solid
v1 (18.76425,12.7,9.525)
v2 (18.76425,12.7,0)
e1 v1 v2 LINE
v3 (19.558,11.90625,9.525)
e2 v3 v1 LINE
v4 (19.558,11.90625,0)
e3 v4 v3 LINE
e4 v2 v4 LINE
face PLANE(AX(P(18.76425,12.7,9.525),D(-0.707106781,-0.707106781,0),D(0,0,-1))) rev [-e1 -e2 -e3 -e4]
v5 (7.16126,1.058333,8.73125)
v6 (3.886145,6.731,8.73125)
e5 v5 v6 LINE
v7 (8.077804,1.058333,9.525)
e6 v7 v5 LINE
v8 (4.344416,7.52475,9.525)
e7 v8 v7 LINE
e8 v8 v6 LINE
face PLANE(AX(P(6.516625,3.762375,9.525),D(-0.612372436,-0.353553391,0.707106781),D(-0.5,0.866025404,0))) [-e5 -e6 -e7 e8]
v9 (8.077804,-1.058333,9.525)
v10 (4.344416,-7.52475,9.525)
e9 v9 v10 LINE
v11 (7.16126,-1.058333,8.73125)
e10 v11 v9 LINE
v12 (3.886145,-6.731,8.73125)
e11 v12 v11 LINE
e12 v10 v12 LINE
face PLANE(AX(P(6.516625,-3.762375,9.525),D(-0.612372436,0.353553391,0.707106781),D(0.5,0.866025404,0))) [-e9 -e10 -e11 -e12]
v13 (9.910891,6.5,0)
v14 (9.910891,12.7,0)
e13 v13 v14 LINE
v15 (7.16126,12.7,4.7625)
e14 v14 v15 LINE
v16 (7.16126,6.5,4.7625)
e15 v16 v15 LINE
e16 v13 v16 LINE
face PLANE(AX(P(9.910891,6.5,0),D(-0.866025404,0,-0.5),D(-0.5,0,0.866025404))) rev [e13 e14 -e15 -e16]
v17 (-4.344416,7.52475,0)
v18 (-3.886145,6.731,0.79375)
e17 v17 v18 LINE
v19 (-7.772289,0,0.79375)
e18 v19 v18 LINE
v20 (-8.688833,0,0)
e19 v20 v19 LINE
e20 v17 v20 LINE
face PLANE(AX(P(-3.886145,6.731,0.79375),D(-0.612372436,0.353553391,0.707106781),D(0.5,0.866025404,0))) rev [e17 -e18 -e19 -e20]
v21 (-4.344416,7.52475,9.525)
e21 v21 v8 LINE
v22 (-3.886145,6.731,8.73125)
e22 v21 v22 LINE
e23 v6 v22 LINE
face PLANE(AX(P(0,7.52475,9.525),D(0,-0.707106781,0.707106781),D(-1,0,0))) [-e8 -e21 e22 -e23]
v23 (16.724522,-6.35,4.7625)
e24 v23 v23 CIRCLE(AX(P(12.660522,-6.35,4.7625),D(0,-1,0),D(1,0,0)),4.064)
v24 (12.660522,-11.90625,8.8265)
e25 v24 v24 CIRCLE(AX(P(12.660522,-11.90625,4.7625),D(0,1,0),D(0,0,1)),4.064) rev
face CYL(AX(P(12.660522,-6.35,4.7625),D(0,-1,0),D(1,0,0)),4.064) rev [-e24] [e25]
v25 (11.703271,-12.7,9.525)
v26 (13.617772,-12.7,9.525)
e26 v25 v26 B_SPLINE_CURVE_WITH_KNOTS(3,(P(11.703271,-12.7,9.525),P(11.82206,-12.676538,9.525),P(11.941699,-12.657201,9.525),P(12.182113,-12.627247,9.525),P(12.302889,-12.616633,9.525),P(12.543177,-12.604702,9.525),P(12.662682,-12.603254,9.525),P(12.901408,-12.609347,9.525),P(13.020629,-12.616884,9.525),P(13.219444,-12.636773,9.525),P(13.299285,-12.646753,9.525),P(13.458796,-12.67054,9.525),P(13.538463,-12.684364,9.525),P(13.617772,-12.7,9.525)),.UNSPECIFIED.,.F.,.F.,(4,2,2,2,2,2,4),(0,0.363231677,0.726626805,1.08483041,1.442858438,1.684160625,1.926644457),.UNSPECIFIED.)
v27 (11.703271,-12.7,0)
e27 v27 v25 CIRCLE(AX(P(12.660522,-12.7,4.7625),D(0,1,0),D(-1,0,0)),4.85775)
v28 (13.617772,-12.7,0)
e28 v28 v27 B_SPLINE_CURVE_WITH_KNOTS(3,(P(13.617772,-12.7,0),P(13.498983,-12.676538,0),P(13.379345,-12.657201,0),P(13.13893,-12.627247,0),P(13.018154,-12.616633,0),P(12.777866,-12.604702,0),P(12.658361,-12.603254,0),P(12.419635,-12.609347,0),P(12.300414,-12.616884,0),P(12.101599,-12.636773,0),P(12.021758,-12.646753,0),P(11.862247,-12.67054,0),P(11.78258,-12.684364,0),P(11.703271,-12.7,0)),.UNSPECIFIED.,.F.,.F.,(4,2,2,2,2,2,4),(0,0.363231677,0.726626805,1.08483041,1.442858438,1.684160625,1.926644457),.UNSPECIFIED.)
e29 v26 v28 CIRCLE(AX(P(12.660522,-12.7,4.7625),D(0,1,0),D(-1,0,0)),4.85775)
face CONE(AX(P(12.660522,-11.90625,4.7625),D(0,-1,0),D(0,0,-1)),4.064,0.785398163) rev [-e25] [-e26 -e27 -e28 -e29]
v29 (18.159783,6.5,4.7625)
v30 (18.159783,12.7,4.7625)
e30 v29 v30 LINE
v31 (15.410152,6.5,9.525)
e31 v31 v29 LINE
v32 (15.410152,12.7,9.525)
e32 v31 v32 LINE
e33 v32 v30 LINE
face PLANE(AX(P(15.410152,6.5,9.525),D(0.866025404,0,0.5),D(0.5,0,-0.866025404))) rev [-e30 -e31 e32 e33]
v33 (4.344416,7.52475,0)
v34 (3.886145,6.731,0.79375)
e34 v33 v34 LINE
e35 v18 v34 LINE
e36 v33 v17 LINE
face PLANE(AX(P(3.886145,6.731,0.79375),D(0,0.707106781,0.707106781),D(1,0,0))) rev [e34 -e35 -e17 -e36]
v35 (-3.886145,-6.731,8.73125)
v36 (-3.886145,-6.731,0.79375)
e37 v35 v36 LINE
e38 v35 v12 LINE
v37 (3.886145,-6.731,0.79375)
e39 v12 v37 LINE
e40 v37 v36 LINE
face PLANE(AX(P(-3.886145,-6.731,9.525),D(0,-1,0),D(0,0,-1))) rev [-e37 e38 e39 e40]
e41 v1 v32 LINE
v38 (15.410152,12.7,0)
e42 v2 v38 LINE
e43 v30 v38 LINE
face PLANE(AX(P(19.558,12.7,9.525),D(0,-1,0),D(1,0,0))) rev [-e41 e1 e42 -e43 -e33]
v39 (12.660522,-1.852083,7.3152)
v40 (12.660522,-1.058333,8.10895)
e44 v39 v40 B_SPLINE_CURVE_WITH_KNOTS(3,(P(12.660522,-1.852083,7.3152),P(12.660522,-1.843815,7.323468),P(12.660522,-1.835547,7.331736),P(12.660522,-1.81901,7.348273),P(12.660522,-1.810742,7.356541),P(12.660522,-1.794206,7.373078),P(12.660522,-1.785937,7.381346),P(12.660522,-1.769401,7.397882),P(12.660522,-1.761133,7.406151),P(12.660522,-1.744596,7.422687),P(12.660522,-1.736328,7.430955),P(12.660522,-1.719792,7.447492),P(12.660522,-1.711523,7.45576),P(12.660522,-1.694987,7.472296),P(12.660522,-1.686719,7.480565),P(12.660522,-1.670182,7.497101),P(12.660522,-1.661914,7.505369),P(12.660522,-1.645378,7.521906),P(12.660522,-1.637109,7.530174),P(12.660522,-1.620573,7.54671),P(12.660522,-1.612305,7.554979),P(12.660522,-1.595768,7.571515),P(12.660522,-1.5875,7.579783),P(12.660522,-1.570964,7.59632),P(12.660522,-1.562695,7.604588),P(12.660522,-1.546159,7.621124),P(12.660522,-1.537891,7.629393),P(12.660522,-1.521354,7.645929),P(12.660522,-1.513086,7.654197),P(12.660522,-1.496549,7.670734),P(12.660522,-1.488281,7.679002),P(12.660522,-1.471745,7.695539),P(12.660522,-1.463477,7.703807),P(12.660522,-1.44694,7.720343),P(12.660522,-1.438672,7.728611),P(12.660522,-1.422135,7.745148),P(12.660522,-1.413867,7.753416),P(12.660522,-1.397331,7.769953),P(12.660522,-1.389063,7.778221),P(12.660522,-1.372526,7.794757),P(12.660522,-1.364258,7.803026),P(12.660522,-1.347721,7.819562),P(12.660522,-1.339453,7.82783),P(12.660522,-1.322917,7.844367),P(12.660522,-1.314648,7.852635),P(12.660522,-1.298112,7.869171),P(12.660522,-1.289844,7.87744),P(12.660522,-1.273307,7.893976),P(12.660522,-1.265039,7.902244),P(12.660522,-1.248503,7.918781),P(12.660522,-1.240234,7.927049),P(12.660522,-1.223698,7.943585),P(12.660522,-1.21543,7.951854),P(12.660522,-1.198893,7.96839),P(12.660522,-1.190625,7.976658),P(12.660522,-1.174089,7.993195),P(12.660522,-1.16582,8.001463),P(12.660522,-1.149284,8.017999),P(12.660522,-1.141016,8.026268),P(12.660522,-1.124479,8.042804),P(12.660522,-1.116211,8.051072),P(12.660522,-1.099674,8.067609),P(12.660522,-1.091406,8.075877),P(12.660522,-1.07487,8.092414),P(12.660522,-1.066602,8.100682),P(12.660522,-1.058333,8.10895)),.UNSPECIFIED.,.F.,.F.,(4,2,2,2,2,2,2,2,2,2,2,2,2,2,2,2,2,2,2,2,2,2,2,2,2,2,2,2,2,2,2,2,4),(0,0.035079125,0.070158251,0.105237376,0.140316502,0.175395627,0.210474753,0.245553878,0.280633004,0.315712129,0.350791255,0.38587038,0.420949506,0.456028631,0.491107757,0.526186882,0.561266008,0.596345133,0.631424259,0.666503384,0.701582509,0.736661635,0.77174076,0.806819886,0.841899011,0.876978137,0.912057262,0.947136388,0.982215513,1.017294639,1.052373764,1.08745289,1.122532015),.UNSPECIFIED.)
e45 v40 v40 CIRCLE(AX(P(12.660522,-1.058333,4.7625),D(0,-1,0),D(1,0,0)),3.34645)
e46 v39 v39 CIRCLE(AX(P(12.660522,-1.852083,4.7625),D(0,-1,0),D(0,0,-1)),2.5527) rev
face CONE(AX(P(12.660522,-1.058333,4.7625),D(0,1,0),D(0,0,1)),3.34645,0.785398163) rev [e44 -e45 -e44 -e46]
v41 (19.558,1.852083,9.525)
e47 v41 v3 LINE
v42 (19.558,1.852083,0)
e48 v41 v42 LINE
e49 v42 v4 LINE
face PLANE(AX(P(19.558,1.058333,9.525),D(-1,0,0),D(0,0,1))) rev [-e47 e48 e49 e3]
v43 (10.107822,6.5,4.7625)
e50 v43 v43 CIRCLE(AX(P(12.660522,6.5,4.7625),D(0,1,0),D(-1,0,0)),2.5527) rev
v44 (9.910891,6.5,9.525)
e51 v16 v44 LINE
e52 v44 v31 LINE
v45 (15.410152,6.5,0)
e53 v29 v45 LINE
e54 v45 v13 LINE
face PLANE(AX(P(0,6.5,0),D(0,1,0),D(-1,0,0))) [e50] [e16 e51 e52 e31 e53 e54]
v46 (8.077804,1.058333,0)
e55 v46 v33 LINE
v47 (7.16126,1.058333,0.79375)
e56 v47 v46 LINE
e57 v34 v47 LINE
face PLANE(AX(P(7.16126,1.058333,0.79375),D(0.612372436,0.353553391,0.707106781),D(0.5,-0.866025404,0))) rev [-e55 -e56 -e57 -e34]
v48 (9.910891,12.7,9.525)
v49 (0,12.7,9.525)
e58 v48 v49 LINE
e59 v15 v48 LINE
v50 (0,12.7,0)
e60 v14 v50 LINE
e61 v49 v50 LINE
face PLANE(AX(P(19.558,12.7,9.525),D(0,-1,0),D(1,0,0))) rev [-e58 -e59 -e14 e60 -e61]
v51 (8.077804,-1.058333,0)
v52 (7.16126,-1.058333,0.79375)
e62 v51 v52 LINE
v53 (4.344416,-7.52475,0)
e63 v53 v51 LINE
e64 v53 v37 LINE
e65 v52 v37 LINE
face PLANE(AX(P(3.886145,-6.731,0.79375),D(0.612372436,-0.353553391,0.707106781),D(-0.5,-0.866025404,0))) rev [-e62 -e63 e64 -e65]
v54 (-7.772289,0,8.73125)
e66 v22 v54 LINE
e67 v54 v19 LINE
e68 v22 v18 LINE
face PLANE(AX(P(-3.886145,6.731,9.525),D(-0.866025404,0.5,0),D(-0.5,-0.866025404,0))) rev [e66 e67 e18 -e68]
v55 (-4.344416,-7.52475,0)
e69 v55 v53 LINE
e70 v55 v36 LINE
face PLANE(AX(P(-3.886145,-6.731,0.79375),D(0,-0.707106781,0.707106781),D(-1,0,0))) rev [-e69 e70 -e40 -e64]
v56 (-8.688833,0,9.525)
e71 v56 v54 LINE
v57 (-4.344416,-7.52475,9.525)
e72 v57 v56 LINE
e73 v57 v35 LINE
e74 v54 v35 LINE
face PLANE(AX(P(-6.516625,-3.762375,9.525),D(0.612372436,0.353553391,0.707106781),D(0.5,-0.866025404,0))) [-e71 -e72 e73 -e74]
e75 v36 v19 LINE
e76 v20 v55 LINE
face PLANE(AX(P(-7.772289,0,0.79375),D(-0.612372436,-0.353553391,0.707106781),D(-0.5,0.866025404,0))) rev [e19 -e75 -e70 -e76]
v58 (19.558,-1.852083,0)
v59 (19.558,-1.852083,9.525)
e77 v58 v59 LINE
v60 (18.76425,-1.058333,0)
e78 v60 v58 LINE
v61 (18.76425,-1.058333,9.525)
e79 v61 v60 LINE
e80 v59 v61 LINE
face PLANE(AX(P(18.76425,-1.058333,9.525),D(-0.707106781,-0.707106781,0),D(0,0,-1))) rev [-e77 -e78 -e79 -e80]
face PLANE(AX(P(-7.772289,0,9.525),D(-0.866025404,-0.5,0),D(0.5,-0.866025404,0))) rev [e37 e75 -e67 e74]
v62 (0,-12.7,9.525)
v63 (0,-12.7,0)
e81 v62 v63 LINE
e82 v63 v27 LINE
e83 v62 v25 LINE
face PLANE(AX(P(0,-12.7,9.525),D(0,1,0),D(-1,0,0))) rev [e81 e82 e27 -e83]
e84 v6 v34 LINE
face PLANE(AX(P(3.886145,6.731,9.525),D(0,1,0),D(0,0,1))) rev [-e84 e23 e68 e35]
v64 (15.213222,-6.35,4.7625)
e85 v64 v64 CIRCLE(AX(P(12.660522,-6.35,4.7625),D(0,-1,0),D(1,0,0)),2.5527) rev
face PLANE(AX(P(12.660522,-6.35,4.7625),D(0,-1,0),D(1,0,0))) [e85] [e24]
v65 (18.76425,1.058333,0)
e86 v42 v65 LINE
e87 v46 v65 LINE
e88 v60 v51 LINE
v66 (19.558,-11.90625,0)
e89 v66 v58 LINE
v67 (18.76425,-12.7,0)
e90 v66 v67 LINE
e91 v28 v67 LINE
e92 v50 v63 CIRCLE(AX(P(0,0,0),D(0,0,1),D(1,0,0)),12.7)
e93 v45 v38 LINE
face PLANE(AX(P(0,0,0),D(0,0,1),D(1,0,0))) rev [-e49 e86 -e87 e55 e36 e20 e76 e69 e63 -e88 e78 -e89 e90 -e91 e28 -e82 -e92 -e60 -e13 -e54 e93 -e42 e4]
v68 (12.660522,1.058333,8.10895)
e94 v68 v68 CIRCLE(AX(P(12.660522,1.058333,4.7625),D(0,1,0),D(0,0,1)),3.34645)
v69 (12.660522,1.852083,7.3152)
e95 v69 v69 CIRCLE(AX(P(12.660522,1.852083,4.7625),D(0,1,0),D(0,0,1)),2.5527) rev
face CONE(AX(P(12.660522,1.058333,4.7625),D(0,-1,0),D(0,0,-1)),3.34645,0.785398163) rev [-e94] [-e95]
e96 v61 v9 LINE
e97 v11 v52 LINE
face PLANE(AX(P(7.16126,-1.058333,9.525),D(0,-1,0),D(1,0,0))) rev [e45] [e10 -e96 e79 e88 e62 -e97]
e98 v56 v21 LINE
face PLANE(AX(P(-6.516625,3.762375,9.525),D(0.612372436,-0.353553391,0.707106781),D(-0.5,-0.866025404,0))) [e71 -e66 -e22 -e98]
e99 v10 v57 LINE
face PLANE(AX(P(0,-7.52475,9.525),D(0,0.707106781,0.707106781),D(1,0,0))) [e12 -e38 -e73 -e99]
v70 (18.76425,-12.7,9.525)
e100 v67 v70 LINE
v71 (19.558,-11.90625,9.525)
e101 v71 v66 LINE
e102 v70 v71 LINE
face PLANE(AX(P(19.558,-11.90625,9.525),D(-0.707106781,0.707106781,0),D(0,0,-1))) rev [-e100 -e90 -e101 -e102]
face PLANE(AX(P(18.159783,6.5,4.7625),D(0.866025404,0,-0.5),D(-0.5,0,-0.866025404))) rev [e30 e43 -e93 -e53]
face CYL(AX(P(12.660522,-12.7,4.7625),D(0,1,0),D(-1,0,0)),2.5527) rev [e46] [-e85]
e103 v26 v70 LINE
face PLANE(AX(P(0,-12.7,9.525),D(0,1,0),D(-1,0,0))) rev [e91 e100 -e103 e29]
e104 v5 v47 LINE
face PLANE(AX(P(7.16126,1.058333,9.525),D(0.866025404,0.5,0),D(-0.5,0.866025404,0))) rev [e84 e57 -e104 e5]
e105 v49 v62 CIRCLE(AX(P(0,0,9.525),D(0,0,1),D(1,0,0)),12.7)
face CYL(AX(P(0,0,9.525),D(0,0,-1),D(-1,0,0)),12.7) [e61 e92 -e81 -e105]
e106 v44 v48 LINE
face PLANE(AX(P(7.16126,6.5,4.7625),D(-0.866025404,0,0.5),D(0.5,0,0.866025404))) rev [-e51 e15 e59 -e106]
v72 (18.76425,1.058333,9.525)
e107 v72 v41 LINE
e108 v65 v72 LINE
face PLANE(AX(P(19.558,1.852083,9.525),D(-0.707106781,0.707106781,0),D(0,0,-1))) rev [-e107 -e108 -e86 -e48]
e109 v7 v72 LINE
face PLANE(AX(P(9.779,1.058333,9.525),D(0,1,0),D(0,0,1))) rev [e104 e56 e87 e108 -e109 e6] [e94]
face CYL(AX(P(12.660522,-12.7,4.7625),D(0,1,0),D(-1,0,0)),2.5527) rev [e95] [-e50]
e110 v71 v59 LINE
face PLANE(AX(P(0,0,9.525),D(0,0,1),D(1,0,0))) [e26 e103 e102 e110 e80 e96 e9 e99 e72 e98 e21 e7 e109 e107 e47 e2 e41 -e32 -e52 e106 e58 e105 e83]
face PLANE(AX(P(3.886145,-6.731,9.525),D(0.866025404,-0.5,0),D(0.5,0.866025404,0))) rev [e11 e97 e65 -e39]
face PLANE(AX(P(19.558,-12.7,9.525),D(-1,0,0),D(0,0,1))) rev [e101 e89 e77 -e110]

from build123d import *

# Parameters (mm, degrees)
BOSS_EXTRUDE1_DEPTH = 9.525
CHAMFER1_SIZE       = 0.79375
SKETCH3_R           = 2.5527
CUT_EXTRUDE1_DEPTH  = 34.442502732
CUT_EXTRUDE2_DEPTH  = 6.2
SKETCH5_R           = 4.064
CUT_EXTRUDE3_DEPTH  = 6.35
CHAFL_N1_SIZE       = 0.79375


with BuildPart() as part:
    # Sketch2 → Boss-Extrude1 (new body)
    with BuildSketch(Plane.XY):
        with BuildLine():
            Line((3.886144662, -6.731), (7.161260289, -1.058333333))
            Line((7.161260289, -1.058333333), (9.779, -1.058333333))
            Line((9.779, -1.058333333), (19.558, -1.058333333))
            Line((19.558, -1.058333333), (19.558, -12.7))
            Line((19.558, -12.7), (0, -12.7))
            ThreePointArc((0, -12.7), (-12.7, 0), (0, 12.7))
            Line((0, 12.7), (19.558, 12.7))
            Line((19.558, 12.7), (19.558, 1.058333333))
            Line((19.558, 1.058333333), (9.779, 1.058333333))
            Line((9.779, 1.058333333), (7.161260289, 1.058333333))
            Line((7.161260289, 1.058333333), (3.886144662, 6.731))
            Line((3.886144662, 6.731), (-3.886144662, 6.731))
            Line((-3.886144662, 6.731), (-7.772289324, 0))
            Line((-7.772289324, 0), (-3.886144662, -6.731))
            Line((-3.886144662, -6.731), (3.886144662, -6.731))
        make_face()
    extrude(amount=BOSS_EXTRUDE1_DEPTH)

    # Chamfer1
    chamfer1_edges = [part.edges().sort_by_distance(p)[0] for p in [
        (5.523702475, 3.894666667, 0),
        (0, 6.731, 0),
        (-5.829216993, 3.3655, 0),
        (-5.829216993, -3.3655, 0),
        (0, -6.731, 0),
        (5.523702475, -3.894666667, 0),
        (19.558, -1.058333333, 4.7625),
        (19.558, -12.7, 4.7625),
        (19.558, 12.7, 4.7625),
        (19.558, 1.058333333, 4.7625),
        (5.523702475, -3.894666667, 9.525),
        (0, -6.731, 9.525),
        (-5.829216993, -3.3655, 9.525),
        (-5.829216993, 3.3655, 9.525),
        (0, 6.731, 9.525),
        (5.523702475, 3.894666667, 9.525),
    ]]
    chamfer(chamfer1_edges, length=CHAMFER1_SIZE)

    # Sketch3 → Cut-Extrude1 (cut, through all)
    with BuildSketch(Plane(origin=(0, 12.7, 0), x_dir=(1, 0, 0), z_dir=(0, 1, 0))):
        with Locations(Location((12.660521603, -4.7625, 0), (0, 0, 180))):
            Circle(SKETCH3_R)
    extrude(amount=-CUT_EXTRUDE1_DEPTH, mode=Mode.SUBTRACT)

    # Sketch4 → Cut-Extrude2 (cut)
    with BuildSketch(Plane(origin=(0, 12.7, 0), x_dir=(1, 0, 0), z_dir=(0, 1, 0))):
        Polygon((9.910890946, -9.525), (15.41015226, -9.525), (18.159782917, -4.7625), (15.41015226, 0), (9.910890946, 0), (7.161260289, -4.7625), align=None)
    extrude(amount=-CUT_EXTRUDE2_DEPTH, mode=Mode.SUBTRACT)

    # Sketch5 → Cut-Extrude3 (cut)
    with BuildSketch(Plane.XZ.offset(12.7)):
        with Locations((12.660521603, 4.7625)):
            Circle(SKETCH5_R)
    extrude(amount=-CUT_EXTRUDE3_DEPTH, mode=Mode.SUBTRACT)

    # Chaflán1
    # the kernel refuses this chamfer: 0.79375 mm, written as the material it takes off along each edge
    with BuildSketch(Plane(origin=(12.660521603, -1.058333333, 4.7625), x_dir=(-1, 0, 0), z_dir=(0, 0, -1))) as chafl_n1_piece_1:
        Polygon((2.5527 + CHAFL_N1_SIZE, 0), (2.5527, -CHAFL_N1_SIZE), (2.5527, 0), align=None)
    revolve(axis=Axis((12.660521603, -1.058333333, 4.7625), (0, 1, 0)), mode=Mode.SUBTRACT)
    with BuildSketch(Plane(origin=(12.660521603, 1.058333333, 4.7625), x_dir=(-1, 0, 0), z_dir=(0, 0, -1))) as chafl_n1_piece_2:
        Polygon((2.5527 + CHAFL_N1_SIZE, 0), (2.5527, CHAFL_N1_SIZE), (2.5527, 0), align=None)
    revolve(axis=Axis((12.660521603, 1.058333333, 4.7625), (0, 1, 0)), mode=Mode.SUBTRACT)
    with BuildSketch(Plane(origin=(12.660521603, -12.7, 4.7625), x_dir=(1, 0, 0), z_dir=(0, 0, -1))) as chafl_n1_piece_3:
        Polygon((4.064 + CHAFL_N1_SIZE, 0), (4.064, -CHAFL_N1_SIZE), (4.064, 0), align=None)
    revolve(axis=Axis((12.660521603, -12.7, 4.7625), (0, -1, 0)), mode=Mode.SUBTRACT)


solid = part.part
